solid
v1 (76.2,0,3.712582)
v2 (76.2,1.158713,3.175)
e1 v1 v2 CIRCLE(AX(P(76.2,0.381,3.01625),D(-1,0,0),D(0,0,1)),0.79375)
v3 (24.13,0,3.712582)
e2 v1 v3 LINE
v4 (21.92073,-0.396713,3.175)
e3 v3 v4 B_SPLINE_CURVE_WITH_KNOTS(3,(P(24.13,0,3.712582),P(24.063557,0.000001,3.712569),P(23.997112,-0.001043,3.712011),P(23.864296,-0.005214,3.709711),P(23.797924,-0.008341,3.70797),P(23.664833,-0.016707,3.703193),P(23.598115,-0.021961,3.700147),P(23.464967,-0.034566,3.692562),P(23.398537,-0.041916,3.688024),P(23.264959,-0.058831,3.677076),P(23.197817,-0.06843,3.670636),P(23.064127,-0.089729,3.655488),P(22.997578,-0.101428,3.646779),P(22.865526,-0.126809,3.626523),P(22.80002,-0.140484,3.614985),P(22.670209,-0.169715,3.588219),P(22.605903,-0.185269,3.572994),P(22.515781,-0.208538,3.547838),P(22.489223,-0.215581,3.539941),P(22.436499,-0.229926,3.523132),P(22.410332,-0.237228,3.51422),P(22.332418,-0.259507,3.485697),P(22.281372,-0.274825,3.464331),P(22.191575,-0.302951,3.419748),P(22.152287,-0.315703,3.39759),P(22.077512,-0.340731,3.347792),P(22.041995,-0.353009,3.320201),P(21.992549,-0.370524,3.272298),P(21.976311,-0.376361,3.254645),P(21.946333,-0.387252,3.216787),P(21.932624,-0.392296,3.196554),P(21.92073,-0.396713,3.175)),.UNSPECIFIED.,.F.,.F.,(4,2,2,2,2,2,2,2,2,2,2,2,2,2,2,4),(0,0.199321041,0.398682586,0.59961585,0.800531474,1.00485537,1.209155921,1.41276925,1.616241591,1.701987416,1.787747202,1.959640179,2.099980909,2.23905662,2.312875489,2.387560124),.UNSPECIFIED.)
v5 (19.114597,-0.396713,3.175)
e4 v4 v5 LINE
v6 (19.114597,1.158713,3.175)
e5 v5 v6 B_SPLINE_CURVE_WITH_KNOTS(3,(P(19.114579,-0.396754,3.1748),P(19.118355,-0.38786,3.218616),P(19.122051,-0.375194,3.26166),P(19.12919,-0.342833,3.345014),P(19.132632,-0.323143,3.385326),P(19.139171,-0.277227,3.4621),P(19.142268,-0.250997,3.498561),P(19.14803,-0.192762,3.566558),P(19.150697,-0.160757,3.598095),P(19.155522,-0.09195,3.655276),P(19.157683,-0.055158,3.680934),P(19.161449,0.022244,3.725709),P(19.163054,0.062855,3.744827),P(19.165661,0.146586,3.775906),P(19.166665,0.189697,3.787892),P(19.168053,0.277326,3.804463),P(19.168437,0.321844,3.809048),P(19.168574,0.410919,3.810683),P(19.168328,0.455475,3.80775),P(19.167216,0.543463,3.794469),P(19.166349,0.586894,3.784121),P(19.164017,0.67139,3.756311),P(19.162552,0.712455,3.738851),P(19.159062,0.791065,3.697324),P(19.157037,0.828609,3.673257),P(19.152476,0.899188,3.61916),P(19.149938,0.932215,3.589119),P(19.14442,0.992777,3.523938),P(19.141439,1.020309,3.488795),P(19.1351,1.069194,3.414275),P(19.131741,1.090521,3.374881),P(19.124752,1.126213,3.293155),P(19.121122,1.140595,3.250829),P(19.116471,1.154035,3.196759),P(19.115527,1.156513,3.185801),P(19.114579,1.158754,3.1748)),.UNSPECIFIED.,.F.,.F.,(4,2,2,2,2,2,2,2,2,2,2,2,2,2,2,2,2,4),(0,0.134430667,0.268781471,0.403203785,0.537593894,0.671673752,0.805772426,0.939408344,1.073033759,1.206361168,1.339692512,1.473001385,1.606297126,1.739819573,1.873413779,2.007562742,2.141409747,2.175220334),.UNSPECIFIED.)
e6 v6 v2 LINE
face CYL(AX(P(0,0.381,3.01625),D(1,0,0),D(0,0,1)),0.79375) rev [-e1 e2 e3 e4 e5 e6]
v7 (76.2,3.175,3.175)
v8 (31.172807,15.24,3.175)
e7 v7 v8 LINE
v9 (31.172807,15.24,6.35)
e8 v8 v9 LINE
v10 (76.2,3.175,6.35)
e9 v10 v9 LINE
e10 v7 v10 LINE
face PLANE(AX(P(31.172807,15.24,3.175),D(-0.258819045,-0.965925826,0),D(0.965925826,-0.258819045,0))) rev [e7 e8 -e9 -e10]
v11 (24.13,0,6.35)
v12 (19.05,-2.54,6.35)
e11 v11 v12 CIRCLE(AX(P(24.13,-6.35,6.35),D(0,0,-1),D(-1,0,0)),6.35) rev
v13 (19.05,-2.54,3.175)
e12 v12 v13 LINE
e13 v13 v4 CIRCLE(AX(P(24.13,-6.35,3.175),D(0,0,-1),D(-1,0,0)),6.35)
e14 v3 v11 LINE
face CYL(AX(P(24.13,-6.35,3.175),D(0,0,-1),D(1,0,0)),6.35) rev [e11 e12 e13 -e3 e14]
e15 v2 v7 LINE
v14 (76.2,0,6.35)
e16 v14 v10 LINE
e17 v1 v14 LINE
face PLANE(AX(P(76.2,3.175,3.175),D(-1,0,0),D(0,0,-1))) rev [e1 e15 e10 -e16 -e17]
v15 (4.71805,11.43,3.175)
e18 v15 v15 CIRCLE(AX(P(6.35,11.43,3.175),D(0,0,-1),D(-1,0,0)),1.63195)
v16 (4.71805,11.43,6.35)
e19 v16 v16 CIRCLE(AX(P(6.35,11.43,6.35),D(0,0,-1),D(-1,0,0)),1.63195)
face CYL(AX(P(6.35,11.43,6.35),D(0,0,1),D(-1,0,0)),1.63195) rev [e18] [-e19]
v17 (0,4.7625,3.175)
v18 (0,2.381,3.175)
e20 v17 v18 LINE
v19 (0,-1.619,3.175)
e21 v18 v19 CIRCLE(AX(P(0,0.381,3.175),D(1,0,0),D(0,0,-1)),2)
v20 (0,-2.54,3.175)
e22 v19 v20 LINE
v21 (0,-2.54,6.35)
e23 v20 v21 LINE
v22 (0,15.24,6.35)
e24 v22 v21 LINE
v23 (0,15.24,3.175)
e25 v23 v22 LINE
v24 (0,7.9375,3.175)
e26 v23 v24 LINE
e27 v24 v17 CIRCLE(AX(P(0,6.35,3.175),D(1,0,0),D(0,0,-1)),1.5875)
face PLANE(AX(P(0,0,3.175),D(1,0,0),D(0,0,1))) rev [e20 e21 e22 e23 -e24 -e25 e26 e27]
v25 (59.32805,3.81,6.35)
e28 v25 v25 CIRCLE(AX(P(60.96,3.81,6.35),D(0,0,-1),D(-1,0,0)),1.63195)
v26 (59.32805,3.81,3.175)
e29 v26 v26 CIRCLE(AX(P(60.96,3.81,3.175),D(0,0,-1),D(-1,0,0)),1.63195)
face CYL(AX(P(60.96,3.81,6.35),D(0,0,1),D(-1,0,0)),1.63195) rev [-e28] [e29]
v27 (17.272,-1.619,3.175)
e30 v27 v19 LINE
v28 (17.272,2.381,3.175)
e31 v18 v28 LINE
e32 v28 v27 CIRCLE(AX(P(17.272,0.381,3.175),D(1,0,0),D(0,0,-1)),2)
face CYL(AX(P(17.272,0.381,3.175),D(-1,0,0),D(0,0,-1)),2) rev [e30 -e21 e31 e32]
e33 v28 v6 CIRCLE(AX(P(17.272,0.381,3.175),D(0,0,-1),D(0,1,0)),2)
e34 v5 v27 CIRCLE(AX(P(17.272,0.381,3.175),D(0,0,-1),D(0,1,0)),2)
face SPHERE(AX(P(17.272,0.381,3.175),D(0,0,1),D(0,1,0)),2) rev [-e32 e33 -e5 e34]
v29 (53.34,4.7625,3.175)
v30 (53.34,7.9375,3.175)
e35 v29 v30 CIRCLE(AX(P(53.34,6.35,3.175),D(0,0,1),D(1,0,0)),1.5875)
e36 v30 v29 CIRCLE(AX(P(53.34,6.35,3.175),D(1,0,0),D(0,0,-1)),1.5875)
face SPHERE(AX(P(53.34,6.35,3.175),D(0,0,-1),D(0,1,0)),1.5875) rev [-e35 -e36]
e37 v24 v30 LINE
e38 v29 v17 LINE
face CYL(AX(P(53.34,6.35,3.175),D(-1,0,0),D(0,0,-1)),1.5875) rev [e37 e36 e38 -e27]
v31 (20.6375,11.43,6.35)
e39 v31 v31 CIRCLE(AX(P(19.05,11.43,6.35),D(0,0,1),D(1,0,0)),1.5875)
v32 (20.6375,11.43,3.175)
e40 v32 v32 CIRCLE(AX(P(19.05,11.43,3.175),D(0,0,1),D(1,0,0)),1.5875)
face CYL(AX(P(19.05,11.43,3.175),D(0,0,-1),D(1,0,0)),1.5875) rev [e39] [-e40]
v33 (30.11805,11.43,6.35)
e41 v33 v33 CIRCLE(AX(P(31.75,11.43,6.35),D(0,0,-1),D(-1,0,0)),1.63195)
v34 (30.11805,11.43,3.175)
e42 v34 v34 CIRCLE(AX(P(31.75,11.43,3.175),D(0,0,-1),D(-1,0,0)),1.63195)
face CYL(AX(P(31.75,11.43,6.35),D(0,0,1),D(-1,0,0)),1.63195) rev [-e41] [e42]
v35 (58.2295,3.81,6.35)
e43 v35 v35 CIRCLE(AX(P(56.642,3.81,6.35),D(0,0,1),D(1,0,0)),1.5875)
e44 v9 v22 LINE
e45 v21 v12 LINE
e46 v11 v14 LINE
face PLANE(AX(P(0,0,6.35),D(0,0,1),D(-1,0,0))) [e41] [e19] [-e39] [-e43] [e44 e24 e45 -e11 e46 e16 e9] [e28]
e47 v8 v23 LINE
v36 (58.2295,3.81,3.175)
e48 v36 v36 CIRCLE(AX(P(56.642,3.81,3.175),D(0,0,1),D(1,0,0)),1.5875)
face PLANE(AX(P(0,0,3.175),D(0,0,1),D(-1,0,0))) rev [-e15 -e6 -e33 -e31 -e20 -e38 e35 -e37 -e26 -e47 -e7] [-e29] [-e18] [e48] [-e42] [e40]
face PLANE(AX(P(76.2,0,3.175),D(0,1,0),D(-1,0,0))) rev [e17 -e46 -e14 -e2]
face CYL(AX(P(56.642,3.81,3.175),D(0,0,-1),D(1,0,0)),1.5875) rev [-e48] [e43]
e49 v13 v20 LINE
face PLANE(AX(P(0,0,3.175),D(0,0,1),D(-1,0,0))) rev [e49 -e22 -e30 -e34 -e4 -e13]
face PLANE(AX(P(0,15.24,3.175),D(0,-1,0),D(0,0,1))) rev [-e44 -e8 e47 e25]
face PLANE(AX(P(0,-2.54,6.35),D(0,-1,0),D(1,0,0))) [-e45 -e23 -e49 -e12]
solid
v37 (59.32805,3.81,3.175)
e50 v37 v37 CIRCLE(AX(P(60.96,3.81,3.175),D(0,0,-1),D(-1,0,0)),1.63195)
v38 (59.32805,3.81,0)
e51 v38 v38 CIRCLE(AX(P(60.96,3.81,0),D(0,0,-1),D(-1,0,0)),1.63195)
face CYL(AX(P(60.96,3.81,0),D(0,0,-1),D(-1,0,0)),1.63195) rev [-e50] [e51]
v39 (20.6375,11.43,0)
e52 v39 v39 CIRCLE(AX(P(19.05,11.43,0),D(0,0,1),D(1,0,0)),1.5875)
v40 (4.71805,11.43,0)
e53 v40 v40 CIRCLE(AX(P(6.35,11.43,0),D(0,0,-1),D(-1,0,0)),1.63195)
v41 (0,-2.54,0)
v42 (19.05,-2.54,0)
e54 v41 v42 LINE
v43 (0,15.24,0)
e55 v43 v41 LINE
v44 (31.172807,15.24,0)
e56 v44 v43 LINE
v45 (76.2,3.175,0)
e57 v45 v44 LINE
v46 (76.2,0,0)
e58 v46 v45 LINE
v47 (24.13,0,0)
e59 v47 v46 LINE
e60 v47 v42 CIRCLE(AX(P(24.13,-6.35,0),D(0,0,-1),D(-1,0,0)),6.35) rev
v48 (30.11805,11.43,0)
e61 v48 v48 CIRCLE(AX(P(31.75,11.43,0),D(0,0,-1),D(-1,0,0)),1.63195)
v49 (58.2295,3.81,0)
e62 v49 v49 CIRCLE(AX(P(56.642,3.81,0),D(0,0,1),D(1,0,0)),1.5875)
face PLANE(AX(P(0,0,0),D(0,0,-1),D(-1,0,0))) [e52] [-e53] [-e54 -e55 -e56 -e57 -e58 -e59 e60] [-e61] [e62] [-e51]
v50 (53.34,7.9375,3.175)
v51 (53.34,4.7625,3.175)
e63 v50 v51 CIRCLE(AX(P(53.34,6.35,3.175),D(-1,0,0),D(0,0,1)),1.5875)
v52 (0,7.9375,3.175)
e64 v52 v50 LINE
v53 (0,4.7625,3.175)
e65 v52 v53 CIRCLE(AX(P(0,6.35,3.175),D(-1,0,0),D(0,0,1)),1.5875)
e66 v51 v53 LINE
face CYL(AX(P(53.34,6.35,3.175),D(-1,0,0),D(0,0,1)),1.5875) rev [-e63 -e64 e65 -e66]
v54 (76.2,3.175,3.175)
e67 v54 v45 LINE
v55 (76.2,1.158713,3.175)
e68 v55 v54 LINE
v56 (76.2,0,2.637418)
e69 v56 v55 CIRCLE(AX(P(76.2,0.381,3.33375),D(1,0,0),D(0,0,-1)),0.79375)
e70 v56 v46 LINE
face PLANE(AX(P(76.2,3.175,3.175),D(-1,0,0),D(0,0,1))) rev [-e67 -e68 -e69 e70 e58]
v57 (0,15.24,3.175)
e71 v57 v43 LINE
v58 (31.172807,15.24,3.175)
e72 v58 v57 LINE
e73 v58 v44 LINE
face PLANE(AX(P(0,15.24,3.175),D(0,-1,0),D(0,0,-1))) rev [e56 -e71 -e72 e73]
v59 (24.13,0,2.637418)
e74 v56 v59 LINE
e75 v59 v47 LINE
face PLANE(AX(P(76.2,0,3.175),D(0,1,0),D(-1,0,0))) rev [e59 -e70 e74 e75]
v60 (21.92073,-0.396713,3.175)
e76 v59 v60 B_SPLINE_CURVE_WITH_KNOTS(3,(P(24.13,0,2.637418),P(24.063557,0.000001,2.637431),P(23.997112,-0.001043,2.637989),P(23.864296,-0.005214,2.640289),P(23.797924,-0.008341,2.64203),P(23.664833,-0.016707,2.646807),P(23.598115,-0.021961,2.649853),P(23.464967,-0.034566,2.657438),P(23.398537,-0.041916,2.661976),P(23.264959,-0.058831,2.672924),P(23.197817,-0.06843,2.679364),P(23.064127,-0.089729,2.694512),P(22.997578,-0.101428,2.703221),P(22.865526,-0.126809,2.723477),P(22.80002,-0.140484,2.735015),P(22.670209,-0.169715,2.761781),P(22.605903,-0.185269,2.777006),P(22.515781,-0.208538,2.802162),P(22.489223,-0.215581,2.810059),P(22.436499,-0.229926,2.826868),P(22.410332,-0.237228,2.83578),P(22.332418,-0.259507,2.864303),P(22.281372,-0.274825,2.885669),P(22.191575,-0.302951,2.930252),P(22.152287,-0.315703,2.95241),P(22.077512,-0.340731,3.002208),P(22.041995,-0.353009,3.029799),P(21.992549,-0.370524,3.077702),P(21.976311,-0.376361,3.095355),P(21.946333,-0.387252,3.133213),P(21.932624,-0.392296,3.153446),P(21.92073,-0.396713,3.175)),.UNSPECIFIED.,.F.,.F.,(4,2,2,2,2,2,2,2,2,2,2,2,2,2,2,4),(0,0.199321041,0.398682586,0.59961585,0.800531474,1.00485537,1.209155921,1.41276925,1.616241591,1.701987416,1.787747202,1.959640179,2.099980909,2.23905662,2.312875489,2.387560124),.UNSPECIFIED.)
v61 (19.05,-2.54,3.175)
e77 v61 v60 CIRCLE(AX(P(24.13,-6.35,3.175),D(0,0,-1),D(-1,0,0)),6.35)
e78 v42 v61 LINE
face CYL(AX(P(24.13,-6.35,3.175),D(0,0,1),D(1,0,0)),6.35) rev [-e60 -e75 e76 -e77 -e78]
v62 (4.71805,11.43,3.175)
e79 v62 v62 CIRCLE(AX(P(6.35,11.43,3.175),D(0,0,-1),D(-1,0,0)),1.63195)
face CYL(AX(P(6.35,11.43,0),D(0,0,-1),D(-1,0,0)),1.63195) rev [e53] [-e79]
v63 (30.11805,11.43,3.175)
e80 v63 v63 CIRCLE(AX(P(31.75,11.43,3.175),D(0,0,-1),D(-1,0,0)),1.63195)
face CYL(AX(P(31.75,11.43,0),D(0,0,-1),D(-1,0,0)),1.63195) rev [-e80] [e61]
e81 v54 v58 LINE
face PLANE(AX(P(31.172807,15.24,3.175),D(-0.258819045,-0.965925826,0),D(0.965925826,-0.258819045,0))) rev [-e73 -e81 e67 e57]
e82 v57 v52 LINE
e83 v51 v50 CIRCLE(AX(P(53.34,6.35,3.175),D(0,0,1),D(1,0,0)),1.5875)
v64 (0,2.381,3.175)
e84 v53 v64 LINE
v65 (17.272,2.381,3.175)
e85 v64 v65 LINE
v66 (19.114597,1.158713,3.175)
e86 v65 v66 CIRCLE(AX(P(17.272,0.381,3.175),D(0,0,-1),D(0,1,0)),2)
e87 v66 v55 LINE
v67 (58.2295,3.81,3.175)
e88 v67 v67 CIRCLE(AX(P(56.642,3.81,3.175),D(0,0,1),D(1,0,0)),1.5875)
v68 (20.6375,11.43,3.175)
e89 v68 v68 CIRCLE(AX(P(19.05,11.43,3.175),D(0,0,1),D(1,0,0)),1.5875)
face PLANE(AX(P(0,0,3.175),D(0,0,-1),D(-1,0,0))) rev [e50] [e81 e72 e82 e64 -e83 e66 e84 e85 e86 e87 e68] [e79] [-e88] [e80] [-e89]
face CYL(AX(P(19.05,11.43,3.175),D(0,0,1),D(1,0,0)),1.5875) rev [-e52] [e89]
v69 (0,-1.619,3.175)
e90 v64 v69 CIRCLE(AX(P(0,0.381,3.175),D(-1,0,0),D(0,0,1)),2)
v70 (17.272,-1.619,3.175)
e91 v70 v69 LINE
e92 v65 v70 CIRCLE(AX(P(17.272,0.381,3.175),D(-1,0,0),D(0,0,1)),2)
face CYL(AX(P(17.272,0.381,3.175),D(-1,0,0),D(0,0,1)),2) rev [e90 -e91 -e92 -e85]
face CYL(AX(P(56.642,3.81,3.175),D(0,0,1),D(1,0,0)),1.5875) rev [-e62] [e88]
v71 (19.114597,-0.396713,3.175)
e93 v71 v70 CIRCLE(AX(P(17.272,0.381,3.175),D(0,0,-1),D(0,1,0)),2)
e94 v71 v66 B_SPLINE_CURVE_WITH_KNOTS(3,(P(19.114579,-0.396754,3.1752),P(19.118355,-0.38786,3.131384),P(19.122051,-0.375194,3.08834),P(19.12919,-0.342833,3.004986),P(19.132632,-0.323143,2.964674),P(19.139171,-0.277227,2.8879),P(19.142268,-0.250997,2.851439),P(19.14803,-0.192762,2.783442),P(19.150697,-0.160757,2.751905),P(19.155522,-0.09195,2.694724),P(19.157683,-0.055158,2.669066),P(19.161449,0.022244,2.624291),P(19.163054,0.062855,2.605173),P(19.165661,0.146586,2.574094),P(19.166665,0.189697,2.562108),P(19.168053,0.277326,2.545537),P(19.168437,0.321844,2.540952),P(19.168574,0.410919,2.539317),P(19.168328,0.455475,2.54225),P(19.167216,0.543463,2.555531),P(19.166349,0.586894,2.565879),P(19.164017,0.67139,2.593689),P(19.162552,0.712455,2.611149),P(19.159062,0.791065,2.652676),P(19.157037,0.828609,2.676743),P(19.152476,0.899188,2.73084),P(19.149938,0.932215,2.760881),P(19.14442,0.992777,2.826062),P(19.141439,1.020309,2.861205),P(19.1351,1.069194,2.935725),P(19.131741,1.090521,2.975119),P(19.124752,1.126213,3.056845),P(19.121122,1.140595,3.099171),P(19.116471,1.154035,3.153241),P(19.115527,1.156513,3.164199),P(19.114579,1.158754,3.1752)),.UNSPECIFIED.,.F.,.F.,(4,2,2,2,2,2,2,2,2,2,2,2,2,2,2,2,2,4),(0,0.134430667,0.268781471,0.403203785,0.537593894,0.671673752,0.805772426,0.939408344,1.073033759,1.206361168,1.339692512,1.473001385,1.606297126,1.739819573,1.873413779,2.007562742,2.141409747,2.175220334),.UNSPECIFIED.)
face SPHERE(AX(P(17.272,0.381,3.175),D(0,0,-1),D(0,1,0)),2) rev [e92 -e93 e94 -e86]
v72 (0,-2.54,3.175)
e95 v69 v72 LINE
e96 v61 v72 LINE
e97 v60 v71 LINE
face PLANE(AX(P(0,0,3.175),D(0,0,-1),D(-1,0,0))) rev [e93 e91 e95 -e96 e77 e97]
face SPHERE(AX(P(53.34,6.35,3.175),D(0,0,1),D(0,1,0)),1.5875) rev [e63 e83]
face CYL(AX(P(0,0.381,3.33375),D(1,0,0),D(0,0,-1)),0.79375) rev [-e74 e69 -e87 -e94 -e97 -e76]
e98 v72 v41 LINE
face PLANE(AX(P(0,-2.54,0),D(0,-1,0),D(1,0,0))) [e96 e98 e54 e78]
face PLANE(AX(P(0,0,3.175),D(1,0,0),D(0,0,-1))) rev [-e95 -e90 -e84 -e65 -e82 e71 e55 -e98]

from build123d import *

# Parameters (mm, degrees)
BOSS_EXTRUDE1_DEPTH        = 3.175
SKETCH11_W                 = 19.05
SKETCH11_H                 = 3.175
BOSS_EXTRUDE2_DEPTH        = 2.54
FILLET2_R                  = 6.35
SKETCH3_R                  = 2
CUT_EXTRUDE2_DEPTH         = 17.272
SKETCH2_R                  = 0.79375
CUT_EXTRUDE1_DEPTH         = 78.773891667
SKETCH9_R                  = 1.5875
CUT_EXTRUDE3_DEPTH         = 53.34
F_4_CLEARANCE_HOLE1_D      = 3.2639
F_1_8_0_1250_DOWEL_HOLE1_D = 3.175


with BuildPart() as part:
    # Sketch1 → Boss-Extrude1 (new body)
    with BuildSketch(Plane.XY):
        Polygon((0, 0), (0, 15.24), (31.172807007, 15.24), (76.2, 3.175), (76.2, 0), align=None)
    extrude(amount=BOSS_EXTRUDE1_DEPTH)

    # Sketch11 → Boss-Extrude2 (add)
    with BuildSketch(Plane.XZ):
        with Locations((9.525, 1.5875)):
            Rectangle(SKETCH11_W, SKETCH11_H)
    extrude(amount=BOSS_EXTRUDE2_DEPTH)

    # Fillet2
    # the kernel refuses this fillet: 6.35 mm, written as the material it adds along each edge
    with BuildSketch(Plane(origin=(19.05, 0, 3.175), x_dir=(0, -1, 0), z_dir=(0, 0, -1))) as fillet2_piece_1:
        with BuildLine():
            CenterArc((6.35, -5.08), FILLET2_R, 126.869897646, 53.130102354)
            Line((0, -5.08), (-0.127, -5.08))
            Line((-0.127, -5.08), (-0.127, 0))
            Line((-0.127, 0), (0, 0.127))
            ThreePointArc((0, 0.127), (1.27, 0.127), (2.4638, 0.1016))
            Line((2.4638, 0.1016), (2.54, 0))
        make_face()
    extrude(amount=3.175)

    # Sketch3 → Cut-Extrude2 (cut)
    with BuildSketch(Plane.ZY):
        with Locations((3.175, 0.381)):
            Circle(SKETCH3_R)
    extrude(amount=-CUT_EXTRUDE2_DEPTH, mode=Mode.SUBTRACT)

    # Sketch2 → Cut-Extrude1 (cut, through all)
    with BuildSketch(Plane(origin=(76.2, 0, 0), x_dir=(0, 0, -1), z_dir=(1, 0, 0))):
        with Locations((-3.33375, 0.381)):
            Circle(SKETCH2_R)
    extrude(amount=-CUT_EXTRUDE1_DEPTH, mode=Mode.SUBTRACT)

    # Sketch9 → Cut-Extrude3 (cut)
    with BuildSketch(Plane.ZY):
        with Locations((3.175, 6.35)):
            Circle(SKETCH9_R)
    extrude(amount=-CUT_EXTRUDE3_DEPTH, mode=Mode.SUBTRACT)

    # Sketch10 → Cut-Revolve2 (revolve, cut)
    with BuildSketch(Plane.ZY.offset(-53.34)):
        with BuildLine():
            Line((3.175, 6.35), (3.175, 7.9375))
            ThreePointArc((3.175, 7.9375), (2.052467985, 7.472532015), (1.5875, 6.35))
            Line((1.5875, 6.35), (3.175, 6.35))
        make_face()
    revolve(axis=Axis((53.34, 6.35, 3.175), (0, 0, -1)), mode=Mode.SUBTRACT)

    # Sketch12 → Cut-Revolve3 (revolve, cut)
    with BuildSketch(Plane.ZY.offset(-17.272)):
        with BuildLine():
            Line((1.175, 0.381), (3.175, 0.381))
            Line((3.175, 0.381), (3.175, 2.381))
            ThreePointArc((3.175, 2.381), (1.760786438, 1.795213562), (1.175, 0.381))
        make_face()
    revolve(axis=Axis((17.272, 0.381, 1.175), (0, 0, 1)), mode=Mode.SUBTRACT)

    # #4 Clearance Hole1 (through all)
    with Locations(Plane(origin=(0, 0, 0), x_dir=(-1, 0, 0), z_dir=(0, 0, -1))):
        with Locations((-31.75, 11.43), (-6.35, 11.43), (-60.96, 3.81)):
            Hole(F_4_CLEARANCE_HOLE1_D / 2)

    # 1/8 (0.1250) Dowel Hole1 (through all)
    with Locations(Plane.XY.offset(3.175)):
        with Locations((19.05, 11.43), (56.642, 3.81)):
            Hole(F_1_8_0_1250_DOWEL_HOLE1_D / 2)


with BuildPart() as body_2:
    # Mirror1: mirrored copy
    add(part.part.mirror(Plane(origin=(0, 0, 3.175), x_dir=(1, 0, 0), z_dir=(0, 0, -1))))


solid = Compound([part.part, body_2.part])
